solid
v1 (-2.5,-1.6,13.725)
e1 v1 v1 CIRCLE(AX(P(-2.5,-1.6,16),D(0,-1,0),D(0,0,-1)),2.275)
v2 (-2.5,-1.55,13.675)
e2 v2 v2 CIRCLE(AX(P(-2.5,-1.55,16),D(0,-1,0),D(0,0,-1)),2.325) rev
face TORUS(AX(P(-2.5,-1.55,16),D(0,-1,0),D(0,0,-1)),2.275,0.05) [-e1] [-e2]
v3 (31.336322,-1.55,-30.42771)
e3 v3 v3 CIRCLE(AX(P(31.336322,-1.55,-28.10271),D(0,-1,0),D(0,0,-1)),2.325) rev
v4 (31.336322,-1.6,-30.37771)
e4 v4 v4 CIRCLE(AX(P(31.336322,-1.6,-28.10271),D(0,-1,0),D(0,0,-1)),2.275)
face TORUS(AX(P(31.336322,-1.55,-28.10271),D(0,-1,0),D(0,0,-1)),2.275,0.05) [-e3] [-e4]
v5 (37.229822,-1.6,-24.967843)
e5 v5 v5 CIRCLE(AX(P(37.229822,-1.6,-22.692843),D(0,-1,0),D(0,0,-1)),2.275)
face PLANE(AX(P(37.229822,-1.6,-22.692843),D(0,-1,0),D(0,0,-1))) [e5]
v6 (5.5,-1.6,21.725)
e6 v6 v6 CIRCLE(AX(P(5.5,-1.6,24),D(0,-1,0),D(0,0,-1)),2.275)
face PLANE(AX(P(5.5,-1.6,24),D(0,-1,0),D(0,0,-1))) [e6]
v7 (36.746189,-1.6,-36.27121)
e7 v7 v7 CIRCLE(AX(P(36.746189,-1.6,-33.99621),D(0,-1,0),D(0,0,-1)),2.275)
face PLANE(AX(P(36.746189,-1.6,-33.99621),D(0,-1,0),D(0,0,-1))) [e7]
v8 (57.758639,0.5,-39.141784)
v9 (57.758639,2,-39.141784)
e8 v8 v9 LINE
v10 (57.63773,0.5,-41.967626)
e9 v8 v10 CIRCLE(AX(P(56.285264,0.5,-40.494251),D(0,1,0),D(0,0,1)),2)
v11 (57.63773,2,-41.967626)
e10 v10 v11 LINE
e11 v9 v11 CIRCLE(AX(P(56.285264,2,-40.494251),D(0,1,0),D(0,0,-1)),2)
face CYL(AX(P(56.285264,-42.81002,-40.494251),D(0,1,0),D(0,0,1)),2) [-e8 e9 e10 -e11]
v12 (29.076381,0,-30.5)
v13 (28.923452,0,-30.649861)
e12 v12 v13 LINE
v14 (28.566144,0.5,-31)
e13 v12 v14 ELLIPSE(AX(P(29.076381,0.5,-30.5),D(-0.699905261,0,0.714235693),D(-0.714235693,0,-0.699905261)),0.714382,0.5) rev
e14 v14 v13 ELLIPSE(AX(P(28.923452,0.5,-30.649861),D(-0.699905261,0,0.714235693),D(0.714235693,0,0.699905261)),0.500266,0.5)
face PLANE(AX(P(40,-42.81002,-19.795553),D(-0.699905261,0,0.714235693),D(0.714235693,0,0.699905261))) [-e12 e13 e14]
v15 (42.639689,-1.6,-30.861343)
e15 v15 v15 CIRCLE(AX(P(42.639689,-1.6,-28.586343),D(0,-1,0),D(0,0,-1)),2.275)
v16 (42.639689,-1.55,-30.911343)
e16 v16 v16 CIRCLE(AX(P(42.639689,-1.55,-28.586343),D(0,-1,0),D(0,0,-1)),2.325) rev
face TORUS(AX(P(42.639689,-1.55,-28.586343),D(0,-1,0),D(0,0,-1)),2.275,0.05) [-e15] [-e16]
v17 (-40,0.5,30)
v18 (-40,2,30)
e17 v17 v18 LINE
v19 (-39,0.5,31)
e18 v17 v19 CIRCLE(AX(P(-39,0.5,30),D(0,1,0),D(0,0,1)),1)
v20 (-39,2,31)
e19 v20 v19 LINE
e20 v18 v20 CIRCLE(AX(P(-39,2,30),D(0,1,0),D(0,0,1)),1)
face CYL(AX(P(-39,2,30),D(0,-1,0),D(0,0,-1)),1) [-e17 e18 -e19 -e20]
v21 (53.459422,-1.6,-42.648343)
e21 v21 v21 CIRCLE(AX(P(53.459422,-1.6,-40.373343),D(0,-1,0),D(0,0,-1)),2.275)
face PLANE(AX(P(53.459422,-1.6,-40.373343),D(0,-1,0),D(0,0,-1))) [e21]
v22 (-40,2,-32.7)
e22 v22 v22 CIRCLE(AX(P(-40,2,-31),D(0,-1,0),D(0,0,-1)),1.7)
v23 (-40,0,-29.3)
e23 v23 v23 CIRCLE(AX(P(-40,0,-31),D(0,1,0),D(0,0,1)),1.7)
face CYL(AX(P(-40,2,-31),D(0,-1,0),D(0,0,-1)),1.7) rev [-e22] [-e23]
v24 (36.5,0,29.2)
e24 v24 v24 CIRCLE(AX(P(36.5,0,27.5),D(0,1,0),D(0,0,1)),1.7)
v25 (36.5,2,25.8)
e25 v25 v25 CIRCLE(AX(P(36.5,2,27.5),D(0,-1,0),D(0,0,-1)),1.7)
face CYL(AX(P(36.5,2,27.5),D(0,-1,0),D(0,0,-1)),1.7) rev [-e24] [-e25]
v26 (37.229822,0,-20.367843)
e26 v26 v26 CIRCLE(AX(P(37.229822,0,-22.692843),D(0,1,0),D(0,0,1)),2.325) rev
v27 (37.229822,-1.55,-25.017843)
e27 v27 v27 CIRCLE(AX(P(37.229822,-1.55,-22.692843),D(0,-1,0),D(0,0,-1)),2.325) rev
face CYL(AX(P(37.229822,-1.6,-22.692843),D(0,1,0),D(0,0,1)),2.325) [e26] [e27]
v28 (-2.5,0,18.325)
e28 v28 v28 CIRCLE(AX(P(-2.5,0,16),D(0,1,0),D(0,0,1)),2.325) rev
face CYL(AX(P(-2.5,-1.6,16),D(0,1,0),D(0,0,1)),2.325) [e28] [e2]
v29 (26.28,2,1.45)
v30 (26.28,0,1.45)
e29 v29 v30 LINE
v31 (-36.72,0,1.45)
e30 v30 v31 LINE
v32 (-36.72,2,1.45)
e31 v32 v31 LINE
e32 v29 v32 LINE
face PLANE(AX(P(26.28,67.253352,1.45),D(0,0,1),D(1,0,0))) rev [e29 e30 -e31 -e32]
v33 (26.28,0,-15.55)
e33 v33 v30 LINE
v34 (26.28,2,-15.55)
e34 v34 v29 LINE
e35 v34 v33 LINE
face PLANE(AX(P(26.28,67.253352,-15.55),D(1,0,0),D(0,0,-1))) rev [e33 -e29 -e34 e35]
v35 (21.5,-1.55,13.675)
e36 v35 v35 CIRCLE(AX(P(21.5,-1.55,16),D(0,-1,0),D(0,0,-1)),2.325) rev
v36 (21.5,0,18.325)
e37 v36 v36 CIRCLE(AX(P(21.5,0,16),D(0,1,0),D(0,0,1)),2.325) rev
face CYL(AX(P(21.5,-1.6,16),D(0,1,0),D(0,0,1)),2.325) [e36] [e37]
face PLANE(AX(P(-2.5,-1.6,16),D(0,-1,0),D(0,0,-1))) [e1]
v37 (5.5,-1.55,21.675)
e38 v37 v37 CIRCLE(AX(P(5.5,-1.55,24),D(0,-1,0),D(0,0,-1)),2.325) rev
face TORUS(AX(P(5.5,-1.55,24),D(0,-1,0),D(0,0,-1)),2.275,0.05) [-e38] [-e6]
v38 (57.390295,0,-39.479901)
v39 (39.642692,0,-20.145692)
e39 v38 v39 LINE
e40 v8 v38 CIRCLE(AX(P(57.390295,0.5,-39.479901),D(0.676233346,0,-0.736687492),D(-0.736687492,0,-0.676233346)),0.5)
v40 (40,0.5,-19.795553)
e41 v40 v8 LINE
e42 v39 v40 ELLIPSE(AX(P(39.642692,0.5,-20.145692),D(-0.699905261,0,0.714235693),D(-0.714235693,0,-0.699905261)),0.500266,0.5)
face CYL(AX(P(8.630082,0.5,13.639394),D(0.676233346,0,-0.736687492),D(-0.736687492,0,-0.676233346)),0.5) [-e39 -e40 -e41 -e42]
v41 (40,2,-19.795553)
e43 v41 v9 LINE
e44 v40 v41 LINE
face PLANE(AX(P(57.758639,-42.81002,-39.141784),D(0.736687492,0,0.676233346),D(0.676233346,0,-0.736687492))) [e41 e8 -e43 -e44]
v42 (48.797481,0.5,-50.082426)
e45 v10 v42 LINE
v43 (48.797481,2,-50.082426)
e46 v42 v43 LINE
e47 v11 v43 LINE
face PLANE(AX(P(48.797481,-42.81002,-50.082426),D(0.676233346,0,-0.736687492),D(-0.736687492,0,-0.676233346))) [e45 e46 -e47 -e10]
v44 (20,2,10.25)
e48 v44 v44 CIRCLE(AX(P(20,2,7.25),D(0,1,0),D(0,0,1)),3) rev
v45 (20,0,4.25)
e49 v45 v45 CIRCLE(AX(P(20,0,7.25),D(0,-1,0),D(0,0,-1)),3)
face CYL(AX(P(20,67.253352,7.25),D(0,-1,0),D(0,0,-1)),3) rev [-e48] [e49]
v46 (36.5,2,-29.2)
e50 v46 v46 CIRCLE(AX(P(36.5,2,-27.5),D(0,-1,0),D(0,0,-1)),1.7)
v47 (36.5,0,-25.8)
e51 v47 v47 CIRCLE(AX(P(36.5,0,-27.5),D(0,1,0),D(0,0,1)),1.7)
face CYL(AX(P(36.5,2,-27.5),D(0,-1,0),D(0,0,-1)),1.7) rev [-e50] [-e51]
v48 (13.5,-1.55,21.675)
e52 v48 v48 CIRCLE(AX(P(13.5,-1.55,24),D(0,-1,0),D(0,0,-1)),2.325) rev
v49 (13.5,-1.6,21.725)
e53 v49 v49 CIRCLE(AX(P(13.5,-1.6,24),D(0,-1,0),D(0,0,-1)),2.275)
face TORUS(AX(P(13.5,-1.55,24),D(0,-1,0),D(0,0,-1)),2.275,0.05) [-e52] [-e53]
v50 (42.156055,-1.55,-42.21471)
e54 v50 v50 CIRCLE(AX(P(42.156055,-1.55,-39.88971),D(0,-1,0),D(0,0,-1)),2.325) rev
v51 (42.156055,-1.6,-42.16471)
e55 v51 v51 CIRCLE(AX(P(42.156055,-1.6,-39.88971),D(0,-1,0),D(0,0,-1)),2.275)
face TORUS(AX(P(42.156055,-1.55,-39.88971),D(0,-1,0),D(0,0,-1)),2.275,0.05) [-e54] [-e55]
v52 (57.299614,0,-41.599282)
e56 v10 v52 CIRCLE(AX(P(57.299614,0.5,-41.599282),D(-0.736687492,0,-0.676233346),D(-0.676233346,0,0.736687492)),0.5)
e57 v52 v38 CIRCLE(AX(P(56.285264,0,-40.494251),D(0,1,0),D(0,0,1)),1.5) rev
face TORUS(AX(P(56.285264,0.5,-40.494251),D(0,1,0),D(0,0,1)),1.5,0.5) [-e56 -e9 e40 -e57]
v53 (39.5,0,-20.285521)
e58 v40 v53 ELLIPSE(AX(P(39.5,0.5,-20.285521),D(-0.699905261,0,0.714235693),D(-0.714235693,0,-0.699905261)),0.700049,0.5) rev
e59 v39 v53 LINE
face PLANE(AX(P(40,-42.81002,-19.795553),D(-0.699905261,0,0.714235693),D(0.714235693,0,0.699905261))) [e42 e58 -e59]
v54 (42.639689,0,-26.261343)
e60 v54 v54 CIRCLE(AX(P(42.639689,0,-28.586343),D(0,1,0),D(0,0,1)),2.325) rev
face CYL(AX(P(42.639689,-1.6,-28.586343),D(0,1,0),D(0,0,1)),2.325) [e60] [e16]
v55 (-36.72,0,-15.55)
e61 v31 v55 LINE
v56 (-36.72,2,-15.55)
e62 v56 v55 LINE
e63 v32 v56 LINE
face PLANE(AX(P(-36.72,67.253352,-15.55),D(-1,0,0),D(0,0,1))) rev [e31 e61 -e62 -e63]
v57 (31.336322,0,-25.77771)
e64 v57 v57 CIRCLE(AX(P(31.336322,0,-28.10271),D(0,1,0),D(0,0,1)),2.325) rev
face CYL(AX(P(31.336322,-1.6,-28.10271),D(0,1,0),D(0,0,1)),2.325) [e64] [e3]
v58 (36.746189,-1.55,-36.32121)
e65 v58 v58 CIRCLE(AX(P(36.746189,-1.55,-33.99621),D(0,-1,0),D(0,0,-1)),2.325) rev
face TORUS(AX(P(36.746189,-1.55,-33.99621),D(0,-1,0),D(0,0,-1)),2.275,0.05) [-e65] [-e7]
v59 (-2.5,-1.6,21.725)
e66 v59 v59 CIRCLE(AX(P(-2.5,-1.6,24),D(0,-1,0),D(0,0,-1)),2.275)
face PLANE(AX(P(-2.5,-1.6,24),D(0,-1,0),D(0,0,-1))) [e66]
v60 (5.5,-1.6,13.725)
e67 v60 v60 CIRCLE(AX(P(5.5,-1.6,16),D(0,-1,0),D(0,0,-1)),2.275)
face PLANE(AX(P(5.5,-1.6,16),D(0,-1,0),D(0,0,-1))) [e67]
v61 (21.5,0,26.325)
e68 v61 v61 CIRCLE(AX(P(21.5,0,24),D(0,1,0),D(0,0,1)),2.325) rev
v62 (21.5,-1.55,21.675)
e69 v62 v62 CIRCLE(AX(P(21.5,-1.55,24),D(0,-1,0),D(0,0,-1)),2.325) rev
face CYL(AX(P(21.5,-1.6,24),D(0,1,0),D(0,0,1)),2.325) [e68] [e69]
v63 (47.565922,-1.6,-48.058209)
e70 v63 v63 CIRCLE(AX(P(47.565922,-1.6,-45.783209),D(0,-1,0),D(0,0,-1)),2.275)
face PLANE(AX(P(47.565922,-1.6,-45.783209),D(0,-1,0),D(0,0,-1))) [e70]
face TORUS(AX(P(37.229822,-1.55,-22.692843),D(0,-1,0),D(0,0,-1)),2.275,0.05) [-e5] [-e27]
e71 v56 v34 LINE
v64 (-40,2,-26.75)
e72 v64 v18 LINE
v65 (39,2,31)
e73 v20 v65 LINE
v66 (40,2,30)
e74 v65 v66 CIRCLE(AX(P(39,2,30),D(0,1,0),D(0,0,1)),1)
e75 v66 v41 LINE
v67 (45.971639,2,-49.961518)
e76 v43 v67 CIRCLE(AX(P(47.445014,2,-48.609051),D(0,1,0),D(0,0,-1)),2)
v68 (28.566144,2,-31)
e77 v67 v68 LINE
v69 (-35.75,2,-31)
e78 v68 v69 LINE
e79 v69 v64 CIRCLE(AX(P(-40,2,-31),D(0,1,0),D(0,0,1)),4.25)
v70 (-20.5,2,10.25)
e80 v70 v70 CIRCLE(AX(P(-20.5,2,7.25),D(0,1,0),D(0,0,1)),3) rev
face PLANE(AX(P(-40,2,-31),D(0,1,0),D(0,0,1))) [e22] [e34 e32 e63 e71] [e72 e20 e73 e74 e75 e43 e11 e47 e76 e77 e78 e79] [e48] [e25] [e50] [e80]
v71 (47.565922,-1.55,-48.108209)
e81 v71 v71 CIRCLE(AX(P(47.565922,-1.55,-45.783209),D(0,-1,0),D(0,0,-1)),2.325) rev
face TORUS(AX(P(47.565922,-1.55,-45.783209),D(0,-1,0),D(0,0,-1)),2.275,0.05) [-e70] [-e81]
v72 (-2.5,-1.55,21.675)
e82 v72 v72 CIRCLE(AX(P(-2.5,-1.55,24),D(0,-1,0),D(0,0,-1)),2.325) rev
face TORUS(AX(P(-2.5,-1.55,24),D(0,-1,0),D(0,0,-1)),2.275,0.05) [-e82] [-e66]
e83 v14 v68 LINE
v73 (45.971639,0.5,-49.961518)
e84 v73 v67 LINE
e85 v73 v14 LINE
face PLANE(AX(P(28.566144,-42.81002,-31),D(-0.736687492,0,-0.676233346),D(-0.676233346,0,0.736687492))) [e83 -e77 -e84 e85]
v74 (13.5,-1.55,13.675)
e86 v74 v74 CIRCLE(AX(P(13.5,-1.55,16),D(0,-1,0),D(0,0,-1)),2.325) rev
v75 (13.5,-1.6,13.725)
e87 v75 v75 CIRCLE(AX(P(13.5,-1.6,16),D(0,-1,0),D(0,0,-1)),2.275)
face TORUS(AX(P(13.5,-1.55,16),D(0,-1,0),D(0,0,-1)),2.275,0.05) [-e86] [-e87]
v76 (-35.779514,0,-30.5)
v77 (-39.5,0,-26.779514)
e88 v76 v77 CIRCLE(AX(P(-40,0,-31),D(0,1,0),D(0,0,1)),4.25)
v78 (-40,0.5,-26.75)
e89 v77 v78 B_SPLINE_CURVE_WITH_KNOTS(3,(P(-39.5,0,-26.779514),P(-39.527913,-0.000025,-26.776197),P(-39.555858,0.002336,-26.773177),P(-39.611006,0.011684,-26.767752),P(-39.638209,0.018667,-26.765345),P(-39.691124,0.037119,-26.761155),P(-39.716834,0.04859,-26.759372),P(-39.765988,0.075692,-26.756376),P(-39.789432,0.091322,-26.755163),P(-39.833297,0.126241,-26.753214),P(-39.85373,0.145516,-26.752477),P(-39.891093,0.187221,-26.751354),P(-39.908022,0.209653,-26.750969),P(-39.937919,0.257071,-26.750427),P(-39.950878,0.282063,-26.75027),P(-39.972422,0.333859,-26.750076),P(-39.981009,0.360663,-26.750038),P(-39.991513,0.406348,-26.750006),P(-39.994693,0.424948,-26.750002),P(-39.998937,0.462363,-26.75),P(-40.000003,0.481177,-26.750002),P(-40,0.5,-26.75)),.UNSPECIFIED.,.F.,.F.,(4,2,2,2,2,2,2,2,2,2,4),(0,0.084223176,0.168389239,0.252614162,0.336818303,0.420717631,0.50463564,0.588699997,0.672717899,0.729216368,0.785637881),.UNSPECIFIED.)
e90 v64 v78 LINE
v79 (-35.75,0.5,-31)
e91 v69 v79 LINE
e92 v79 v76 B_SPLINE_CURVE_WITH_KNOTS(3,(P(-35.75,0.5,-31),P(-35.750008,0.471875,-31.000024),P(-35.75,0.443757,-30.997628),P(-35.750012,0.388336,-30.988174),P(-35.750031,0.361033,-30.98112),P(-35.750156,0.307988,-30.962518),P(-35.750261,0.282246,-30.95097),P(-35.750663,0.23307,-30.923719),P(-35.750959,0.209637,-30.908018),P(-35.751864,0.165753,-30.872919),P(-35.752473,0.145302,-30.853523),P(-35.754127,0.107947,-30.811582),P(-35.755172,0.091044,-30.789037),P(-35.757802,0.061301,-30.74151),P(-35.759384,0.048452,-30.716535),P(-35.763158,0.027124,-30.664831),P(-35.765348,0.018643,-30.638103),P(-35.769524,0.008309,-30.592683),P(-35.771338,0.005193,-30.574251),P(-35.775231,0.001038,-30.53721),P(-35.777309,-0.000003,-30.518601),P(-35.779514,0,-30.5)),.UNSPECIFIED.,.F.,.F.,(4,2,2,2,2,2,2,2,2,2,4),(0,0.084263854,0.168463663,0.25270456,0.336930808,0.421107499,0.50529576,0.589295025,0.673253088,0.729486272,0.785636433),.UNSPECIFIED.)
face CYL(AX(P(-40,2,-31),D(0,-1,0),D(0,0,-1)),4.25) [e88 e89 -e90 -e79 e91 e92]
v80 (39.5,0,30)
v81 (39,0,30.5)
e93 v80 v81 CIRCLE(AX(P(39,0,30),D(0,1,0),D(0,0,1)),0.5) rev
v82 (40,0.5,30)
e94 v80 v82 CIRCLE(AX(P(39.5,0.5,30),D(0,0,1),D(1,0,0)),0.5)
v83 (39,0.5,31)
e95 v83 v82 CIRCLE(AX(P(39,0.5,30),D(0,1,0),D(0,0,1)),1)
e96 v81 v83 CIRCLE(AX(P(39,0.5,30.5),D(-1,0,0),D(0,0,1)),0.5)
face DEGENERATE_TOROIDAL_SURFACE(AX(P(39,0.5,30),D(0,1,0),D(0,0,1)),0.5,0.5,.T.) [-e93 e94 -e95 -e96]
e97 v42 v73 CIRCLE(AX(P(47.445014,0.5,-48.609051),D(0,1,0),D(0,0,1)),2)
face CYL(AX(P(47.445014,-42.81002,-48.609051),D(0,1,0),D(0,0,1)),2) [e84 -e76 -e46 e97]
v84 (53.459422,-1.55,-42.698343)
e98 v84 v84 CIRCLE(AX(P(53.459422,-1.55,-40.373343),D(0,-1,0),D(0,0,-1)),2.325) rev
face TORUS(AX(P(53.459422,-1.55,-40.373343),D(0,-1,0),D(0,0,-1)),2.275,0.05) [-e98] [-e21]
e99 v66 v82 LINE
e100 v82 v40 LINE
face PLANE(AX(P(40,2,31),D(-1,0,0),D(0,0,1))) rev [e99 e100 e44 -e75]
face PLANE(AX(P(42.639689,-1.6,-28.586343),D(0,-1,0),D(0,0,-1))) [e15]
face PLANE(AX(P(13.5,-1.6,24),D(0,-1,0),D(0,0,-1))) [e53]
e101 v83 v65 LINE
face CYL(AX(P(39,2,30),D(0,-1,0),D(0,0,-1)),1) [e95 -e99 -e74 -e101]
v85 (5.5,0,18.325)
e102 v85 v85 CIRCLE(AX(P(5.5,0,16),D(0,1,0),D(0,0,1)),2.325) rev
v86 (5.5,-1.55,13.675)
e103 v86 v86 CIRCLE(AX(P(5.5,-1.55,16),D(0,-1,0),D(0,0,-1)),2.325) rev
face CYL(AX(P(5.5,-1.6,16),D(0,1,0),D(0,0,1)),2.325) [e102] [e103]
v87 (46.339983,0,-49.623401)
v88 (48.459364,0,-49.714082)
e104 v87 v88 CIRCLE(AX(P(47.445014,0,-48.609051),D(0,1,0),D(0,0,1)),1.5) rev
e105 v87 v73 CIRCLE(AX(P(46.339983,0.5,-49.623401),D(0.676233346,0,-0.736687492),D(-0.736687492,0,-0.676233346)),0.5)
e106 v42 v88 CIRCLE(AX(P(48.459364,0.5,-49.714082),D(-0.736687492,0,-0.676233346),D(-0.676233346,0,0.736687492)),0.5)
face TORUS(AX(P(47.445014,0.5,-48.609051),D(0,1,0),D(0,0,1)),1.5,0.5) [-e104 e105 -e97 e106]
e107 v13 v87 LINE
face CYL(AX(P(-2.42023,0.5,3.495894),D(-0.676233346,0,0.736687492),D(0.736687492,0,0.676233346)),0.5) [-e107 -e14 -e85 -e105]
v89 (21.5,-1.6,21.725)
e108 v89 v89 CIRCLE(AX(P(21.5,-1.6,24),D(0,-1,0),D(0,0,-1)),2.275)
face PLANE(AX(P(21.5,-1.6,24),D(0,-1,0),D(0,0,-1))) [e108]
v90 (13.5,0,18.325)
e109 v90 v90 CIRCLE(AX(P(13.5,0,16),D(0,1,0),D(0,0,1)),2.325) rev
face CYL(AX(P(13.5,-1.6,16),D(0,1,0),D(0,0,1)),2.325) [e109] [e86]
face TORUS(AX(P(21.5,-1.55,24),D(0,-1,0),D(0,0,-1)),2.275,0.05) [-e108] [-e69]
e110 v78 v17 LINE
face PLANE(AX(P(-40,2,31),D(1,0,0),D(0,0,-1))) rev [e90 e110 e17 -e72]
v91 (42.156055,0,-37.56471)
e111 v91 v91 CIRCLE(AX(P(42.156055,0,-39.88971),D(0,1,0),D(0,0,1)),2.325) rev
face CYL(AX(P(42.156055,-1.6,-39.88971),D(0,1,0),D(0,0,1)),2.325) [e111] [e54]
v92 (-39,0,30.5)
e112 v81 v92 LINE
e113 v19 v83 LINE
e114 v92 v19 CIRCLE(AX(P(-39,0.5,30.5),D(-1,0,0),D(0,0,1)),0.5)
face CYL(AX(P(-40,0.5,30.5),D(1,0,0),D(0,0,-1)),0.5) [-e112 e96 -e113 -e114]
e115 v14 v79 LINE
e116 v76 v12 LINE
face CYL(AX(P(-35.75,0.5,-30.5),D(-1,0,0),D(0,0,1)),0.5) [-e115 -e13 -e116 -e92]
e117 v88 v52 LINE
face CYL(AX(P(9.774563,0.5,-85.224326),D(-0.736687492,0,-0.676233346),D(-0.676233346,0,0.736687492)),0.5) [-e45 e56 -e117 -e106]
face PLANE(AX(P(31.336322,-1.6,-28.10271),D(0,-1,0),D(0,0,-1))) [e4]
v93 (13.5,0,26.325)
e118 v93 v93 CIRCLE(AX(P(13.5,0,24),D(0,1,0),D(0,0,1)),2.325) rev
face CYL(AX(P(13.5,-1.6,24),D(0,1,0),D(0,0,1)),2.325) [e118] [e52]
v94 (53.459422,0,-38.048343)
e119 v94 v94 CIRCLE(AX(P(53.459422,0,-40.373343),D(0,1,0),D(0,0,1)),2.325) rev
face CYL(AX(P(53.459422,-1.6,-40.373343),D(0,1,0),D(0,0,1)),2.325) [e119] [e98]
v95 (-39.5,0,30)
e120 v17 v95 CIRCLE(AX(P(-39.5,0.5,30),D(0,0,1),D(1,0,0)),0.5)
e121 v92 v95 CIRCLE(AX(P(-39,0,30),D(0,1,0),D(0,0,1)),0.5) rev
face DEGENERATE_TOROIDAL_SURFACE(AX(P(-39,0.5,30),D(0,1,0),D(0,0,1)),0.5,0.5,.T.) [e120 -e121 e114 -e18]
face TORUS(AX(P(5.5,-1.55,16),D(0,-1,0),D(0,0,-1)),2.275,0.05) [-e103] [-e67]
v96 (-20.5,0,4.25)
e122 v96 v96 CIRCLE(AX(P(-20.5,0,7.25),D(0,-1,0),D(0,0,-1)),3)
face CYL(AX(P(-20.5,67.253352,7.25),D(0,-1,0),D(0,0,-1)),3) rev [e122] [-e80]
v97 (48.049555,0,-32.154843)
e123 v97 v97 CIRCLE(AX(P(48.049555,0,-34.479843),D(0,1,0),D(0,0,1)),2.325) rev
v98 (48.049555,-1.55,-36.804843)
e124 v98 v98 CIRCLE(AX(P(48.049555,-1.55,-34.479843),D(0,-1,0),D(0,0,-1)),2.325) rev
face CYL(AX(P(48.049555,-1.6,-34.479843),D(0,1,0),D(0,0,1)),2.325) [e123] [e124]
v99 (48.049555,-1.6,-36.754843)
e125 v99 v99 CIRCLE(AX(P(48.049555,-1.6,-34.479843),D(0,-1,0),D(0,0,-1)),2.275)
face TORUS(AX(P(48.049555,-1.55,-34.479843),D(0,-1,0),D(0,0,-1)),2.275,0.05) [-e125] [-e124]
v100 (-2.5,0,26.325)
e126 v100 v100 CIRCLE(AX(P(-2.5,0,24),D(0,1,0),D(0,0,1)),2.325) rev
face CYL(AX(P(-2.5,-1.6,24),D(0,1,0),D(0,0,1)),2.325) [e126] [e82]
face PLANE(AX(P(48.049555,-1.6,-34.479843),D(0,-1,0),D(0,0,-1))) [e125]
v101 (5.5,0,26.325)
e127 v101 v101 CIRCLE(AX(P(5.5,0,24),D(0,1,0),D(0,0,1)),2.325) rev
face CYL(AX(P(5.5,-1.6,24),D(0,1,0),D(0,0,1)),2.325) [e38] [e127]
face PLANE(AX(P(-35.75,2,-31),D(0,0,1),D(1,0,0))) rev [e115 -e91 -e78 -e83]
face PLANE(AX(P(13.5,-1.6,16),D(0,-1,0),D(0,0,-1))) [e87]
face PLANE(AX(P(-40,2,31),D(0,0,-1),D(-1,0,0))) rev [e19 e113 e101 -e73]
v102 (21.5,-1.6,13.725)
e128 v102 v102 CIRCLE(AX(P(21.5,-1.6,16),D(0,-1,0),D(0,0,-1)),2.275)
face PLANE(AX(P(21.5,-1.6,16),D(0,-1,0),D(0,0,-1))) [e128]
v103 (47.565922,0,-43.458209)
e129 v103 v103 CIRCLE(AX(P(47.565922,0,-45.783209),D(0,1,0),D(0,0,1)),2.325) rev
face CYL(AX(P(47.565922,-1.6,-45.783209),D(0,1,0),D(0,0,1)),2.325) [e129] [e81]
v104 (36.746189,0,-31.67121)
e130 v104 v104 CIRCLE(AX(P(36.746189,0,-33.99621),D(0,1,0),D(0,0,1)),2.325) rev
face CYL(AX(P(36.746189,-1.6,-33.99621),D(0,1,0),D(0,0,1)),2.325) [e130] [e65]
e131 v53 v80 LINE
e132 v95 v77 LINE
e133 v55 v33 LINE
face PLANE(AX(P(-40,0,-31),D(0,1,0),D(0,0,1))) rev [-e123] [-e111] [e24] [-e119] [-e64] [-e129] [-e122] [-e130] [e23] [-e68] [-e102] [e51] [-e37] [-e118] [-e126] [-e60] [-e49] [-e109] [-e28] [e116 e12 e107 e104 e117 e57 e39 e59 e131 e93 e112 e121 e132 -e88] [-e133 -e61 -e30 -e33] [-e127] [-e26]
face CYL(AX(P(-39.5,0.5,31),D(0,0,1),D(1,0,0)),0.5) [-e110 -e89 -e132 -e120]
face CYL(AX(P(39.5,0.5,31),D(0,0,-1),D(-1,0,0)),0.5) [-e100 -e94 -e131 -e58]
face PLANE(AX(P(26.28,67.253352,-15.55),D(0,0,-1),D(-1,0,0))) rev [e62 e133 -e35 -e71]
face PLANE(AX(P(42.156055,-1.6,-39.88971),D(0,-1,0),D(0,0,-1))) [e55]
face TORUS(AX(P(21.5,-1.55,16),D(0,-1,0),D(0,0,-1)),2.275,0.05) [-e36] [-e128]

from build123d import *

# Parameters (mm, degrees)
MAIN_BODY_DEPTH        = 2
CORNERS_R              = 1
EDGE_2_R               = 0.5
DIVINGBOARD_DEPTH      = 2
FILLET5_R              = 0.5
LID_HOLES_DEPTH        = 78.216889535
LID_HOLES_DEPTH_BACK   = 78.216889535
SKETCH7_R              = 1.7
SKETCH4_R              = 2.325
BOSS_EXTRUDE3_DEPTH    = 1.6
FILLET3_R              = 0.05
LPATTERN5_COUNT        = 4
LPATTERN5_PITCH        = 8
FILLET3_OF_LPATTERN5_R = 0.05
SKETCH9_R              = 2.325
PEGS_DIAGONAL_DEPTH    = 1.6
FILLET6_R              = 0.05
LPATTERN7_COUNT        = 4
LPATTERN7_PITCH        = 8
FILLET6_OF_LPATTERN7_R = 0.05
SKETCH6_R              = 3
SKETCH6_W              = 63
SKETCH6_H              = 17
SCREEN_LED_HOLES_DEPTH = 2


# Read off the part's stored shape, not the designer's step: LPattern6
with BuildPart() as part:
    # Sketch1 → Main Body (new body)
    with BuildSketch(Plane(origin=(0, 0, 0), x_dir=(1, 0, 0), z_dir=(0, 1, 0))):
        with BuildLine():
            Line((-40, -31), (40, -31))
            Line((40, -31), (40, 31))
            Line((40, 31), (-35.75, 31))
            ThreePointArc((-35.75, 31), (-43.00520382, 34.00520382), (-40, 26.75))
            Line((-40, 26.75), (-40, -31))
        make_face()
    extrude(amount=MAIN_BODY_DEPTH)

    # Corners
    corners_edges = [part.edges().sort_by_distance(p)[0] for p in [
        (40, 1, 31),
        (-40, 1, 31),
        (40, 1, -31),
    ]]
    fillet(corners_edges, radius=CORNERS_R)

    # Edge 2
    edge_2_edges = [part.edges().sort_by_distance(p)[0] for p in [
        (0, 0, 31),
        (40, 0, 0),
        (1.625, 0, -31),
        (39.707106781, 0, 30.707106781),
        (39.707106781, 0, -30.707106781),
        (-39.707106781, 0, 30.707106781),
        (-40, 0, 1.625),
    ]]
    fillet(edge_2_edges, radius=EDGE_2_R)

    # Sketch8 → DivingBoard (add)
    with BuildSketch(Plane(origin=(0, 2, 0), x_dir=(1, 0, 0), z_dir=(0, 1, 0))):
        with BuildLine():
            Line((28.566143568, 31), (45.971638844, 49.96151786))
            ThreePointArc((45.971638844, 49.96151786), (47.359518755, 50.60722298), (48.797480521, 50.082426152))
            Line((48.797480521, 50.082426152), (57.637730431, 41.967625999))
            ThreePointArc((57.637730431, 41.967625999), (58.283435551, 40.579746087), (57.758638723, 39.141784321))
            Line((57.758638723, 39.141784321), (40, 19.795552572))
            Line((40, 19.795552572), (28.566143568, 31))
        make_face()
    extrude(amount=-DIVINGBOARD_DEPTH)

    # Fillet5
    fillet5_edges = [part.edges().sort_by_distance(p)[0] for p in [
        (47.359518755, 0, -50.60722298),
        (58.283435551, 0, -40.579746087),
        (37.268891206, 0, -40.48075893),
        (48.879319362, 0, -29.468668447),
        (53.217605476, 0, -46.025026075),
    ]]
    fillet(fillet5_edges, radius=FILLET5_R)

    # Sketch7 → Lid Holes (cut, two sides: drawn at the far end of the back side and taken through both)
    with BuildSketch(Plane(origin=(0, 0, 0), x_dir=(-1, 0, 0), z_dir=(0, -1, 0)).offset(-LID_HOLES_DEPTH_BACK)):
        with Locations(Location((-36.5, 27.5, 0), (0, 0, 90))):
            Circle(SKETCH7_R)
        with Locations(Location((-36.5, -27.5, 0), (0, 0, 90))):
            Circle(SKETCH7_R)
        with Locations(Location((40, 31, 0), (0, 0, 90))):
            Circle(SKETCH7_R)
    extrude(amount=LID_HOLES_DEPTH + LID_HOLES_DEPTH_BACK, mode=Mode.SUBTRACT)

    # Sketch4 → Boss-Extrude3 (add)
    with BuildSketch(Plane(origin=(0, 0, 0), x_dir=(-1, 0, 0), z_dir=(0, -1, 0))):
        with Locations(Location((-21.5, -24, 0), (0, 0, 270))):
            Circle(SKETCH4_R)
    boss_extrude3 = extrude(amount=BOSS_EXTRUDE3_DEPTH)

    # Fillet3
    fillet3_edges = [part.edges().sort_by_distance(p)[0] for p in [
        (21.5, -1.6, 21.675),
    ]]
    fillet(fillet3_edges, radius=FILLET3_R)

    # LPattern5: Boss-Extrude3 ×4
    with Locations(*[(-i * LPATTERN5_PITCH, 0, 0) for i in range(1, LPATTERN5_COUNT)]):
        add(boss_extrude3)

    # Fillet3 of LPattern5
    fillet3_of_lpattern5_edges = [part.edges().sort_by_distance(p)[0] for p in [
        (13.5, -1.6, 21.675),
        (5.5, -1.6, 21.675),
        (-2.5, -1.6, 21.675),
    ]]
    fillet(fillet3_of_lpattern5_edges, radius=FILLET3_OF_LPATTERN5_R)

    # LPattern6 outline → LPattern6 (revolve)
    with BuildSketch(Plane(origin=(21.5, 0, 16), x_dir=(1, 0, 0), z_dir=(0, 0, 1))):
        with BuildLine():
            Line((0, 0), (0, -1.6))
            Line((0, -1.6), (2.275, -1.6))
            ThreePointArc((2.275, -1.6), (2.310355339, -1.585355339), (2.325, -1.55))
            Line((2.325, -1.55), (2.325, 0))
            Line((2.325, 0), (0, 0))
        make_face()
    revolve(axis=Axis((21.5, 0, 16), (0, 1, 0)))

    # LPattern6 2 outline → LPattern6 2 (revolve)
    with BuildSketch(Plane(origin=(13.5, 0, 16), x_dir=(1, 0, 0), z_dir=(0, 0, 1))):
        with BuildLine():
            Line((0, 0), (0, -1.6))
            Line((0, -1.6), (2.275, -1.6))
            ThreePointArc((2.275, -1.6), (2.310355339, -1.585355339), (2.325, -1.55))
            Line((2.325, -1.55), (2.325, 0))
            Line((2.325, 0), (0, 0))
        make_face()
    revolve(axis=Axis((13.5, 0, 16), (0, 1, 0)))

    # LPattern6 3 outline → LPattern6 3 (revolve)
    with BuildSketch(Plane(origin=(5.5, 0, 16), x_dir=(1, 0, 0), z_dir=(0, 0, 1))):
        with BuildLine():
            Line((0, 0), (0, -1.6))
            Line((0, -1.6), (2.275, -1.6))
            ThreePointArc((2.275, -1.6), (2.310355339, -1.585355339), (2.325, -1.55))
            Line((2.325, -1.55), (2.325, 0))
            Line((2.325, 0), (0, 0))
        make_face()
    revolve(axis=Axis((5.5, 0, 16), (0, 1, 0)))

    # LPattern6 4 outline → LPattern6 4 (revolve)
    with BuildSketch(Plane(origin=(-2.5, 0, 16), x_dir=(1, 0, 0), z_dir=(0, 0, 1))):
        with BuildLine():
            Line((0, 0), (0, -1.6))
            Line((0, -1.6), (2.275, -1.6))
            ThreePointArc((2.275, -1.6), (2.310355339, -1.585355339), (2.325, -1.55))
            Line((2.325, -1.55), (2.325, 0))
            Line((2.325, 0), (0, 0))
        make_face()
    revolve(axis=Axis((-2.5, 0, 16), (0, 1, 0)))

    # Sketch9 → Pegs (Diagonal) (add)
    with BuildSketch(Plane(origin=(0, 0, 0), x_dir=(-1, 0, 0), z_dir=(0, -1, 0))):
        with Locations(Location((-47.565922121, 45.78320949, 0), (0, 0, 270))):
            Circle(SKETCH9_R)
        with Locations(Location((-53.459422061, 40.373342721, 0), (0, 0, 270))):
            Circle(SKETCH9_R)
    pegs_diagonal = extrude(amount=PEGS_DIAGONAL_DEPTH)

    # Fillet6
    fillet6_edges = [part.edges().sort_by_distance(p)[0] for p in [
        (47.565922121, -1.6, -48.10820949),
        (53.459422061, -1.6, -42.698342721),
    ]]
    fillet(fillet6_edges, radius=FILLET6_R)

    # LPattern7: Pegs (Diagonal) ×4
    with Locations(*[Vector(-0.6762333461397131, 0, 0.7366874924747177) * (i * LPATTERN7_PITCH) for i in range(1, LPATTERN7_COUNT)]):
        add(pegs_diagonal)

    # Fillet6 of LPattern7
    fillet6_of_lpattern7_edges = [part.edges().sort_by_distance(p)[0] for p in [
        (42.156055352, -1.6, -42.21470955),
        (48.049555292, -1.6, -36.804842781),
        (36.746188583, -1.6, -36.321209611),
        (42.639688523, -1.6, -30.911342841),
        (31.336321814, -1.6, -30.427709671),
        (37.229821754, -1.6, -25.017842902),
    ]]
    fillet(fillet6_of_lpattern7_edges, radius=FILLET6_OF_LPATTERN7_R)

    # Sketch6 → Screen & LED holes (cut)
    with BuildSketch(Plane(origin=(0, 0, 0), x_dir=(-1, 0, 0), z_dir=(0, -1, 0))):
        with Locations(Location((20.5, -7.25, 0), (0, 0, 90))):
            Circle(SKETCH6_R)
        with Locations(Location((-20, -7.25, 0), (0, 0, 90))):
            Circle(SKETCH6_R)
        with Locations((5.22, 7.05)):
            Rectangle(SKETCH6_W, SKETCH6_H)
    extrude(amount=-SCREEN_LED_HOLES_DEPTH, mode=Mode.SUBTRACT)


solid = part.part
